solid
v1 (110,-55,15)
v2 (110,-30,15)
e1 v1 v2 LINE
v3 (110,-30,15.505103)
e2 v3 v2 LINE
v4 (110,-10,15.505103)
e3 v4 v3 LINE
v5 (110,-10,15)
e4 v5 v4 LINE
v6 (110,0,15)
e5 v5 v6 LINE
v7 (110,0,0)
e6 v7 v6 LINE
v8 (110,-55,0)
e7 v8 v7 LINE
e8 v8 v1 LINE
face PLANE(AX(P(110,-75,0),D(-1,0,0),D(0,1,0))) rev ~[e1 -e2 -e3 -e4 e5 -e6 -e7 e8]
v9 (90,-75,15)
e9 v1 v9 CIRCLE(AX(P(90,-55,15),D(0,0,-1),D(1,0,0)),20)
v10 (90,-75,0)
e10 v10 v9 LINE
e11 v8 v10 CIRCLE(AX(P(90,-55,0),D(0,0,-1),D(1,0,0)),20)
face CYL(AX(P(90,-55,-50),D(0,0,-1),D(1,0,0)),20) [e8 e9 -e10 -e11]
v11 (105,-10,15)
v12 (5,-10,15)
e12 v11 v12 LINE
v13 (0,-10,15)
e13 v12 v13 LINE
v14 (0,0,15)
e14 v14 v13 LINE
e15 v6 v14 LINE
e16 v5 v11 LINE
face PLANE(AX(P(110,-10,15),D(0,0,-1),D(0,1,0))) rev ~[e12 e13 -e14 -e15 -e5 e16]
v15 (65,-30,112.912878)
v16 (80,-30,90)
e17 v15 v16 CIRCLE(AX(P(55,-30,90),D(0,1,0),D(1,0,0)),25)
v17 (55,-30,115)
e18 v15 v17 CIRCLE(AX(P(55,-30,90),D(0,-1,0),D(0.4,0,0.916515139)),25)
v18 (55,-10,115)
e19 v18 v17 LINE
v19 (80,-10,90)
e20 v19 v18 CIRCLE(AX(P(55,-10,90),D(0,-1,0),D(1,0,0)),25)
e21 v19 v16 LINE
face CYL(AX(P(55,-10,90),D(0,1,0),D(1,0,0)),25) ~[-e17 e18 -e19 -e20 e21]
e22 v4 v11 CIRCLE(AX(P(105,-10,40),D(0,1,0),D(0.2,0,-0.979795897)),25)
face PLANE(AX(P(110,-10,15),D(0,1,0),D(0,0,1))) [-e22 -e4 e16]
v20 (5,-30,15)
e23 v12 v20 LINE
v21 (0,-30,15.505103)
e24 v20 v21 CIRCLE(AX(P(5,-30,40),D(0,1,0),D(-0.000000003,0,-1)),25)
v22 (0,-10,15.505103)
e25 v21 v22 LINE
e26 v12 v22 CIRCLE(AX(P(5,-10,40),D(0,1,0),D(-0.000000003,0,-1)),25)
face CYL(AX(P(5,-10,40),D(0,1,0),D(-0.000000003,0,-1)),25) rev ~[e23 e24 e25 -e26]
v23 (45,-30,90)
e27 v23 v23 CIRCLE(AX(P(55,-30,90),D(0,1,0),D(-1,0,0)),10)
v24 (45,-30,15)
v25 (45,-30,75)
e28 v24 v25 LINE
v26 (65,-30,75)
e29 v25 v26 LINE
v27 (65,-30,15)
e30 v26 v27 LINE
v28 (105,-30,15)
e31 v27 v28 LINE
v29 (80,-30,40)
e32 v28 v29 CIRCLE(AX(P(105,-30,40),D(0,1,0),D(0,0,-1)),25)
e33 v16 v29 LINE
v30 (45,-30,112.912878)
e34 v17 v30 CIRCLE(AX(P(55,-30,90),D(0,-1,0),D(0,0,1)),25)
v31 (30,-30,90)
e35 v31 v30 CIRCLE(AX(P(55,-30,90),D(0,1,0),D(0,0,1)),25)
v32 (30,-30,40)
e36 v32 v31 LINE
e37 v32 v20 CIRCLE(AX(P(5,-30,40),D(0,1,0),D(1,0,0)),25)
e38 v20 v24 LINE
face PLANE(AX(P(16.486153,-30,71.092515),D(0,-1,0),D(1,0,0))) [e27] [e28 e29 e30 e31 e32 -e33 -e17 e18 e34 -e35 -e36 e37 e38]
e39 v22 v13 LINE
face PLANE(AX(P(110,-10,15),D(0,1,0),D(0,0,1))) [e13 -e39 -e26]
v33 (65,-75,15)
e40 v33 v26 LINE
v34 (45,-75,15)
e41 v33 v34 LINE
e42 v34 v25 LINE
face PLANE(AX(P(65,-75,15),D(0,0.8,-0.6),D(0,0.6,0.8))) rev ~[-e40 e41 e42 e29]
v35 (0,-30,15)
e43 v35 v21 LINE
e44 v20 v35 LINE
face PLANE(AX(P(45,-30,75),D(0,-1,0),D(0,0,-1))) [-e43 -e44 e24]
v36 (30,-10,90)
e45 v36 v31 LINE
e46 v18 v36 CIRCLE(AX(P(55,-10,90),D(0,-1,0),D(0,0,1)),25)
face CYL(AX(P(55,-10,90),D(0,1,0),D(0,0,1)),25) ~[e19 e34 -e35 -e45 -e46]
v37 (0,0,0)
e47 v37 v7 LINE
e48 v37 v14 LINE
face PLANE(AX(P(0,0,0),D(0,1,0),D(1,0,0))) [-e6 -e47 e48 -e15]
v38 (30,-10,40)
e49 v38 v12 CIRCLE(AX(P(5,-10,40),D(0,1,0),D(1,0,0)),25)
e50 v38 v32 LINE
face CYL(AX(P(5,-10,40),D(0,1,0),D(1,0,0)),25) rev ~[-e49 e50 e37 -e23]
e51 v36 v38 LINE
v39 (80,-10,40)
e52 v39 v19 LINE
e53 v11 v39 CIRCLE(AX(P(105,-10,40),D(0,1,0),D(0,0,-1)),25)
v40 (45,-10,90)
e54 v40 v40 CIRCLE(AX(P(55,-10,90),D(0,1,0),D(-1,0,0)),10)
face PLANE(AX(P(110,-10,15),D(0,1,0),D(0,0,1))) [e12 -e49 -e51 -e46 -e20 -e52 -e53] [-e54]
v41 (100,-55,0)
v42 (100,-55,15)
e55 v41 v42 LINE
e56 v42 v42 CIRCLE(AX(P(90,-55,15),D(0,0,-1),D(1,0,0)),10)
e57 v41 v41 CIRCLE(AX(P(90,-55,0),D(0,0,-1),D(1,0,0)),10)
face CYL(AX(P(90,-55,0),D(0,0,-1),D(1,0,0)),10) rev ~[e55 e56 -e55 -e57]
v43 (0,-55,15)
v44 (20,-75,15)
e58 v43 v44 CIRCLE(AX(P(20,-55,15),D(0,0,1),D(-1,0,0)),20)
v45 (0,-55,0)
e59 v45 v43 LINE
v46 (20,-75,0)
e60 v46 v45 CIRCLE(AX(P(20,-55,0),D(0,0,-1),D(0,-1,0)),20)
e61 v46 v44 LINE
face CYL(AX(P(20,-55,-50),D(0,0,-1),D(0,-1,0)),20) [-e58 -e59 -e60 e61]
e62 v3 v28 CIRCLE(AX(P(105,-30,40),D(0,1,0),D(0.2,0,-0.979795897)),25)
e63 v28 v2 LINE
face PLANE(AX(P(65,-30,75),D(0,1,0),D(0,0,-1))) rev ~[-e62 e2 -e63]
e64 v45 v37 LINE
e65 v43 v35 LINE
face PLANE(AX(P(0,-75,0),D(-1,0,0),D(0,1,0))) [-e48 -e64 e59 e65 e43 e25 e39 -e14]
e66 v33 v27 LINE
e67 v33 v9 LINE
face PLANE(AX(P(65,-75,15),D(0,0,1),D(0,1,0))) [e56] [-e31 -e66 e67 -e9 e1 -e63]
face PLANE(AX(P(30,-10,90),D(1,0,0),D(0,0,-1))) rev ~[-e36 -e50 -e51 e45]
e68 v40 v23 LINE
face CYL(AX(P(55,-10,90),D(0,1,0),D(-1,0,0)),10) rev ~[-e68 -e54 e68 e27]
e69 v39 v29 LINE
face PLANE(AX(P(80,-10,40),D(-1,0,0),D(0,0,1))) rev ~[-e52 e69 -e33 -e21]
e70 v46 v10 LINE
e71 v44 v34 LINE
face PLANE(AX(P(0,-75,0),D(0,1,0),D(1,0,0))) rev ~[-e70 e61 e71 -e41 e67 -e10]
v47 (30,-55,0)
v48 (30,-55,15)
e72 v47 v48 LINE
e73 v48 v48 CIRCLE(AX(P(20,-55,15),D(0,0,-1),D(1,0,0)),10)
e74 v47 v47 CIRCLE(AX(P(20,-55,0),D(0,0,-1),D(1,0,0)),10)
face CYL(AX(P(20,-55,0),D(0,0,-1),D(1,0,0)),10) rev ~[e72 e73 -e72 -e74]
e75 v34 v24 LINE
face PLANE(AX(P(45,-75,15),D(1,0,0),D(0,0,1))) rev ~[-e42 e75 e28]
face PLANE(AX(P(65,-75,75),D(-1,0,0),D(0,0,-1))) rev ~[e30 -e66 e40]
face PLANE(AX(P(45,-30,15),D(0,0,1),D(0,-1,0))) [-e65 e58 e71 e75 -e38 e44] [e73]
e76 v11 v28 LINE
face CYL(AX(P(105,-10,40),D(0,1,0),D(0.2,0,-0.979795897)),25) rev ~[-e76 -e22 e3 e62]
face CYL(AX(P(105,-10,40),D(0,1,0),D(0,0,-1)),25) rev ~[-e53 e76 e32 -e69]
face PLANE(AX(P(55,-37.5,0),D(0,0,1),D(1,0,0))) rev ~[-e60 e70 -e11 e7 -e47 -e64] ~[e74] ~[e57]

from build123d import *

# Parameters (mm, degrees)
F0_W         = 110
F0_H         = 75
F1_DEPTH     = 115
F2_W         = 10
F2_H         = 100
F3_DEPTH     = 110.001
F4_R         = 10
F5_DEPTH     = 65.001
F6_R         = 10
F7_DEPTH     = 115.001
F9_DEPTH     = 45
F11_DEPTH    = 65.001
F12_T1_DEPTH = 115.5051025722
F12_T3_DEPTH = 115
F14_DEPTH    = 45.0010001
F16_DEPTH    = 45.0010001


# Not quite as in the source:
# - a fillet or chamfer that OpenCascade refuses, or shapes differently, is made with other operations: its cross-section is extruded or revolved along the edge and cut away or added


with BuildPart() as f1:
    # F0 (on Top) → F1 (new body)
    with BuildSketch(Plane.XY):
        with Locations((55, -37.5)):
            Rectangle(F0_W, F0_H)
    extrude(amount=F1_DEPTH)

    # F2 (on face) → F3 (cut, through all)
    with BuildSketch(Plane.YZ.offset(110)):
        with Locations((-5, 65)):
            Rectangle(F2_W, F2_H)
    extrude(amount=-F3_DEPTH, mode=Mode.SUBTRACT)

    # F4 (on face) → F5 (cut, through all)
    with BuildSketch(Plane(origin=(0, -10, 0), x_dir=(-1, 0, 0), z_dir=(0, 1, 0))):
        with BuildLine():
            ThreePointArc((-110, 64.4948974278), (-89.1886116992, 59.364916731), (-80, 40))
            Line((-80, 40), (-80, 90))
            Line((-80, 90), (-80, 115))
            Line((-80, 115), (-110, 115))
            Line((-110, 115), (-110, 64.4948974278))
        make_face()
        with BuildLine():
            ThreePointArc((-105, 15), (-87.3223304703, 22.3223304703), (-80, 40))
            ThreePointArc((-80, 40), (-89.1886116992, 59.364916731), (-110, 64.4948974278))
            Line((-110, 64.4948974278), (-110, 15.5051025722))
            ThreePointArc((-110, 15.5051025722), (-107.5127240501, 15.1265961749), (-105, 15))
        make_face()
        with BuildLine():
            ThreePointArc((0, 64.4948974278), (-20.8113883008, 59.364916731), (-30, 40))
            ThreePointArc((-30, 40), (-22.6776695035, 22.3223304441), (-4.9999999259, 15))
            ThreePointArc((-4.9999999259, 15), (-2.487275913, 15.1265961786), (0, 15.5051025722))
            Line((0, 15.5051025722), (0, 64.4948974278))
        make_face()
        with BuildLine():
            Line((-30, 90), (-30, 40))
            ThreePointArc((-30, 40), (-20.8113883008, 59.364916731), (0, 64.4948974278))
            Line((0, 64.4948974278), (0, 115))
            Line((0, 115), (-30, 115))
            Line((-30, 115), (-30, 90))
        make_face()
        with BuildLine():
            ThreePointArc((-55, 115), (-37.3223304703, 107.6776695297), (-30, 90))
            Line((-30, 90), (-30, 115))
            Line((-30, 115), (-55, 115))
        make_face()
        with BuildLine():
            Line((-80, 115), (-80, 90))
            ThreePointArc((-80, 90), (-72.6776695297, 107.6776695297), (-55, 115))
            Line((-55, 115), (-80, 115))
        make_face()
        with Locations((-55, 90)):
            Circle(F4_R)
    extrude(amount=-F5_DEPTH, mode=Mode.SUBTRACT)

    # F6 (on face) → F7 (cut, through all)
    with BuildSketch(Plane(origin=(0, 0, 0), x_dir=(1, 0, 0), z_dir=(0, 0, -1))):
        with Locations((90, 55)):
            Circle(F6_R)
        with Locations((20, 55)):
            Circle(F6_R)
    extrude(amount=-F7_DEPTH, mode=Mode.SUBTRACT)

    # F8 (on face) → F9 (cut)
    with BuildSketch(Plane.XZ.offset(75)):
        with BuildLine():
            Line((0, 115), (0, 15.5051025722))
            ThreePointArc((0, 15.5051025722), (2.4872759548, 15.1265961744), (5.00000001, 15))
            ThreePointArc((5.00000001, 15), (22.6776695332, 22.3223304739), (30, 40))
            Line((30, 40), (30, 90))
            ThreePointArc((30, 90), (34.0834993366, 103.6930639376), (45, 112.9128784748))
            Line((45, 112.9128784748), (45, 115))
            Line((45, 115), (0, 115))
        make_face()
        with BuildLine():
            ThreePointArc((30, 40), (22.6776695332, 22.3223304739), (5.00000001, 15))
            Line((5.00000001, 15), (45, 15))
            Line((45, 15), (45, 75))
            Line((45, 75), (45, 90))
            Line((45, 90), (45, 112.9128784748))
            ThreePointArc((45, 112.9128784748), (34.0834993366, 103.6930639376), (30, 90))
            Line((30, 90), (30, 40))
        make_face()
        with BuildLine():
            ThreePointArc((105.0000000223, 15), (107.5127240612, 15.126596176), (110, 15.5051025722))
            Line((110, 15.5051025722), (110, 115))
            Line((110, 115), (65, 115))
            Line((65, 115), (65, 112.9128784748))
            ThreePointArc((65, 112.9128784748), (75.9165006634, 103.6930639376), (80, 90))
            Line((80, 90), (80, 40))
            ThreePointArc((80, 40), (87.3223304782, 22.3223304625), (105.0000000223, 15))
        make_face()
        with BuildLine():
            Line((65, 15), (105.0000000223, 15))
            ThreePointArc((105.0000000223, 15), (87.3223304782, 22.3223304625), (80, 40))
            Line((80, 40), (80, 90))
            ThreePointArc((80, 90), (75.9165006634, 103.6930639376), (65, 112.9128784748))
            Line((65, 112.9128784748), (65, 90))
            Line((65, 90), (65, 75))
            Line((65, 75), (65, 15))
        make_face()
        with BuildLine():
            Line((45, 90), (45, 75))
            Line((45, 75), (65, 75))
            Line((65, 75), (65, 90))
            ThreePointArc((65, 90), (55, 80), (45, 90))
        make_face()
        with BuildLine():
            ThreePointArc((65, 112.9128784748), (60.1077410922, 114.4726578233), (55, 115))
            ThreePointArc((55, 115), (49.8922589078, 114.4726578233), (45, 112.9128784748))
            Line((45, 112.9128784748), (45, 90))
            ThreePointArc((45, 90), (55, 100), (65, 90))
            Line((65, 90), (65, 112.9128784748))
        make_face()
        with BuildLine():
            ThreePointArc((65, 90), (55, 100), (45, 90))
            ThreePointArc((45, 90), (55, 80), (65, 90))
        make_face()
    extrude(amount=-F9_DEPTH, mode=Mode.SUBTRACT)

    # F10 (on face) → F11 (cut, through all)
    with BuildSketch(Plane.YZ.offset(65)):
        Polygon((-75, 75), (-75, 15), (-30, 75), align=None)
    extrude(amount=-F11_DEPTH, mode=Mode.SUBTRACT)

    # F12: fillet of radius 20 on 2 edges, made by hand

    # F12_s2 → F12_t1 (cut)
    with BuildSketch(Plane.XY.offset(-50)):
        with BuildLine():
            ThreePointArc((110, -55), (104.1421356237, -69.1421356237), (90, -75))
            Line((90, -75), (110, -75))
            Line((110, -75), (110, -55))
        make_face()
    extrude(amount=F12_T1_DEPTH, mode=Mode.SUBTRACT)

    # F12_s4 → F12_t3 (cut)
    with BuildSketch(Plane.XY.offset(-50)):
        with BuildLine():
            ThreePointArc((20, -75), (5.8578643763, -69.1421356237), (0, -55))
            Line((0, -55), (0, -75))
            Line((0, -75), (20, -75))
        make_face()
    extrude(amount=F12_T3_DEPTH, mode=Mode.SUBTRACT)

    # F14 (cut, through all): a face of the model
    f14_faces = [f1.faces().sort_by_distance(p)[0] for p in [
        (65, -45, 35),
    ]]
    extrude(f14_faces, amount=F14_DEPTH, mode=Mode.SUBTRACT)

    # F15 (on face) → F16 (cut, through all)
    with BuildSketch(Plane(origin=(45, 0, 0), x_dir=(0, -1, 0), z_dir=(-1, 0, 0))):
        Polygon((30, 75), (30, 15), (75, 15), align=None)
    extrude(amount=F16_DEPTH, mode=Mode.SUBTRACT)


solid = f1.part
